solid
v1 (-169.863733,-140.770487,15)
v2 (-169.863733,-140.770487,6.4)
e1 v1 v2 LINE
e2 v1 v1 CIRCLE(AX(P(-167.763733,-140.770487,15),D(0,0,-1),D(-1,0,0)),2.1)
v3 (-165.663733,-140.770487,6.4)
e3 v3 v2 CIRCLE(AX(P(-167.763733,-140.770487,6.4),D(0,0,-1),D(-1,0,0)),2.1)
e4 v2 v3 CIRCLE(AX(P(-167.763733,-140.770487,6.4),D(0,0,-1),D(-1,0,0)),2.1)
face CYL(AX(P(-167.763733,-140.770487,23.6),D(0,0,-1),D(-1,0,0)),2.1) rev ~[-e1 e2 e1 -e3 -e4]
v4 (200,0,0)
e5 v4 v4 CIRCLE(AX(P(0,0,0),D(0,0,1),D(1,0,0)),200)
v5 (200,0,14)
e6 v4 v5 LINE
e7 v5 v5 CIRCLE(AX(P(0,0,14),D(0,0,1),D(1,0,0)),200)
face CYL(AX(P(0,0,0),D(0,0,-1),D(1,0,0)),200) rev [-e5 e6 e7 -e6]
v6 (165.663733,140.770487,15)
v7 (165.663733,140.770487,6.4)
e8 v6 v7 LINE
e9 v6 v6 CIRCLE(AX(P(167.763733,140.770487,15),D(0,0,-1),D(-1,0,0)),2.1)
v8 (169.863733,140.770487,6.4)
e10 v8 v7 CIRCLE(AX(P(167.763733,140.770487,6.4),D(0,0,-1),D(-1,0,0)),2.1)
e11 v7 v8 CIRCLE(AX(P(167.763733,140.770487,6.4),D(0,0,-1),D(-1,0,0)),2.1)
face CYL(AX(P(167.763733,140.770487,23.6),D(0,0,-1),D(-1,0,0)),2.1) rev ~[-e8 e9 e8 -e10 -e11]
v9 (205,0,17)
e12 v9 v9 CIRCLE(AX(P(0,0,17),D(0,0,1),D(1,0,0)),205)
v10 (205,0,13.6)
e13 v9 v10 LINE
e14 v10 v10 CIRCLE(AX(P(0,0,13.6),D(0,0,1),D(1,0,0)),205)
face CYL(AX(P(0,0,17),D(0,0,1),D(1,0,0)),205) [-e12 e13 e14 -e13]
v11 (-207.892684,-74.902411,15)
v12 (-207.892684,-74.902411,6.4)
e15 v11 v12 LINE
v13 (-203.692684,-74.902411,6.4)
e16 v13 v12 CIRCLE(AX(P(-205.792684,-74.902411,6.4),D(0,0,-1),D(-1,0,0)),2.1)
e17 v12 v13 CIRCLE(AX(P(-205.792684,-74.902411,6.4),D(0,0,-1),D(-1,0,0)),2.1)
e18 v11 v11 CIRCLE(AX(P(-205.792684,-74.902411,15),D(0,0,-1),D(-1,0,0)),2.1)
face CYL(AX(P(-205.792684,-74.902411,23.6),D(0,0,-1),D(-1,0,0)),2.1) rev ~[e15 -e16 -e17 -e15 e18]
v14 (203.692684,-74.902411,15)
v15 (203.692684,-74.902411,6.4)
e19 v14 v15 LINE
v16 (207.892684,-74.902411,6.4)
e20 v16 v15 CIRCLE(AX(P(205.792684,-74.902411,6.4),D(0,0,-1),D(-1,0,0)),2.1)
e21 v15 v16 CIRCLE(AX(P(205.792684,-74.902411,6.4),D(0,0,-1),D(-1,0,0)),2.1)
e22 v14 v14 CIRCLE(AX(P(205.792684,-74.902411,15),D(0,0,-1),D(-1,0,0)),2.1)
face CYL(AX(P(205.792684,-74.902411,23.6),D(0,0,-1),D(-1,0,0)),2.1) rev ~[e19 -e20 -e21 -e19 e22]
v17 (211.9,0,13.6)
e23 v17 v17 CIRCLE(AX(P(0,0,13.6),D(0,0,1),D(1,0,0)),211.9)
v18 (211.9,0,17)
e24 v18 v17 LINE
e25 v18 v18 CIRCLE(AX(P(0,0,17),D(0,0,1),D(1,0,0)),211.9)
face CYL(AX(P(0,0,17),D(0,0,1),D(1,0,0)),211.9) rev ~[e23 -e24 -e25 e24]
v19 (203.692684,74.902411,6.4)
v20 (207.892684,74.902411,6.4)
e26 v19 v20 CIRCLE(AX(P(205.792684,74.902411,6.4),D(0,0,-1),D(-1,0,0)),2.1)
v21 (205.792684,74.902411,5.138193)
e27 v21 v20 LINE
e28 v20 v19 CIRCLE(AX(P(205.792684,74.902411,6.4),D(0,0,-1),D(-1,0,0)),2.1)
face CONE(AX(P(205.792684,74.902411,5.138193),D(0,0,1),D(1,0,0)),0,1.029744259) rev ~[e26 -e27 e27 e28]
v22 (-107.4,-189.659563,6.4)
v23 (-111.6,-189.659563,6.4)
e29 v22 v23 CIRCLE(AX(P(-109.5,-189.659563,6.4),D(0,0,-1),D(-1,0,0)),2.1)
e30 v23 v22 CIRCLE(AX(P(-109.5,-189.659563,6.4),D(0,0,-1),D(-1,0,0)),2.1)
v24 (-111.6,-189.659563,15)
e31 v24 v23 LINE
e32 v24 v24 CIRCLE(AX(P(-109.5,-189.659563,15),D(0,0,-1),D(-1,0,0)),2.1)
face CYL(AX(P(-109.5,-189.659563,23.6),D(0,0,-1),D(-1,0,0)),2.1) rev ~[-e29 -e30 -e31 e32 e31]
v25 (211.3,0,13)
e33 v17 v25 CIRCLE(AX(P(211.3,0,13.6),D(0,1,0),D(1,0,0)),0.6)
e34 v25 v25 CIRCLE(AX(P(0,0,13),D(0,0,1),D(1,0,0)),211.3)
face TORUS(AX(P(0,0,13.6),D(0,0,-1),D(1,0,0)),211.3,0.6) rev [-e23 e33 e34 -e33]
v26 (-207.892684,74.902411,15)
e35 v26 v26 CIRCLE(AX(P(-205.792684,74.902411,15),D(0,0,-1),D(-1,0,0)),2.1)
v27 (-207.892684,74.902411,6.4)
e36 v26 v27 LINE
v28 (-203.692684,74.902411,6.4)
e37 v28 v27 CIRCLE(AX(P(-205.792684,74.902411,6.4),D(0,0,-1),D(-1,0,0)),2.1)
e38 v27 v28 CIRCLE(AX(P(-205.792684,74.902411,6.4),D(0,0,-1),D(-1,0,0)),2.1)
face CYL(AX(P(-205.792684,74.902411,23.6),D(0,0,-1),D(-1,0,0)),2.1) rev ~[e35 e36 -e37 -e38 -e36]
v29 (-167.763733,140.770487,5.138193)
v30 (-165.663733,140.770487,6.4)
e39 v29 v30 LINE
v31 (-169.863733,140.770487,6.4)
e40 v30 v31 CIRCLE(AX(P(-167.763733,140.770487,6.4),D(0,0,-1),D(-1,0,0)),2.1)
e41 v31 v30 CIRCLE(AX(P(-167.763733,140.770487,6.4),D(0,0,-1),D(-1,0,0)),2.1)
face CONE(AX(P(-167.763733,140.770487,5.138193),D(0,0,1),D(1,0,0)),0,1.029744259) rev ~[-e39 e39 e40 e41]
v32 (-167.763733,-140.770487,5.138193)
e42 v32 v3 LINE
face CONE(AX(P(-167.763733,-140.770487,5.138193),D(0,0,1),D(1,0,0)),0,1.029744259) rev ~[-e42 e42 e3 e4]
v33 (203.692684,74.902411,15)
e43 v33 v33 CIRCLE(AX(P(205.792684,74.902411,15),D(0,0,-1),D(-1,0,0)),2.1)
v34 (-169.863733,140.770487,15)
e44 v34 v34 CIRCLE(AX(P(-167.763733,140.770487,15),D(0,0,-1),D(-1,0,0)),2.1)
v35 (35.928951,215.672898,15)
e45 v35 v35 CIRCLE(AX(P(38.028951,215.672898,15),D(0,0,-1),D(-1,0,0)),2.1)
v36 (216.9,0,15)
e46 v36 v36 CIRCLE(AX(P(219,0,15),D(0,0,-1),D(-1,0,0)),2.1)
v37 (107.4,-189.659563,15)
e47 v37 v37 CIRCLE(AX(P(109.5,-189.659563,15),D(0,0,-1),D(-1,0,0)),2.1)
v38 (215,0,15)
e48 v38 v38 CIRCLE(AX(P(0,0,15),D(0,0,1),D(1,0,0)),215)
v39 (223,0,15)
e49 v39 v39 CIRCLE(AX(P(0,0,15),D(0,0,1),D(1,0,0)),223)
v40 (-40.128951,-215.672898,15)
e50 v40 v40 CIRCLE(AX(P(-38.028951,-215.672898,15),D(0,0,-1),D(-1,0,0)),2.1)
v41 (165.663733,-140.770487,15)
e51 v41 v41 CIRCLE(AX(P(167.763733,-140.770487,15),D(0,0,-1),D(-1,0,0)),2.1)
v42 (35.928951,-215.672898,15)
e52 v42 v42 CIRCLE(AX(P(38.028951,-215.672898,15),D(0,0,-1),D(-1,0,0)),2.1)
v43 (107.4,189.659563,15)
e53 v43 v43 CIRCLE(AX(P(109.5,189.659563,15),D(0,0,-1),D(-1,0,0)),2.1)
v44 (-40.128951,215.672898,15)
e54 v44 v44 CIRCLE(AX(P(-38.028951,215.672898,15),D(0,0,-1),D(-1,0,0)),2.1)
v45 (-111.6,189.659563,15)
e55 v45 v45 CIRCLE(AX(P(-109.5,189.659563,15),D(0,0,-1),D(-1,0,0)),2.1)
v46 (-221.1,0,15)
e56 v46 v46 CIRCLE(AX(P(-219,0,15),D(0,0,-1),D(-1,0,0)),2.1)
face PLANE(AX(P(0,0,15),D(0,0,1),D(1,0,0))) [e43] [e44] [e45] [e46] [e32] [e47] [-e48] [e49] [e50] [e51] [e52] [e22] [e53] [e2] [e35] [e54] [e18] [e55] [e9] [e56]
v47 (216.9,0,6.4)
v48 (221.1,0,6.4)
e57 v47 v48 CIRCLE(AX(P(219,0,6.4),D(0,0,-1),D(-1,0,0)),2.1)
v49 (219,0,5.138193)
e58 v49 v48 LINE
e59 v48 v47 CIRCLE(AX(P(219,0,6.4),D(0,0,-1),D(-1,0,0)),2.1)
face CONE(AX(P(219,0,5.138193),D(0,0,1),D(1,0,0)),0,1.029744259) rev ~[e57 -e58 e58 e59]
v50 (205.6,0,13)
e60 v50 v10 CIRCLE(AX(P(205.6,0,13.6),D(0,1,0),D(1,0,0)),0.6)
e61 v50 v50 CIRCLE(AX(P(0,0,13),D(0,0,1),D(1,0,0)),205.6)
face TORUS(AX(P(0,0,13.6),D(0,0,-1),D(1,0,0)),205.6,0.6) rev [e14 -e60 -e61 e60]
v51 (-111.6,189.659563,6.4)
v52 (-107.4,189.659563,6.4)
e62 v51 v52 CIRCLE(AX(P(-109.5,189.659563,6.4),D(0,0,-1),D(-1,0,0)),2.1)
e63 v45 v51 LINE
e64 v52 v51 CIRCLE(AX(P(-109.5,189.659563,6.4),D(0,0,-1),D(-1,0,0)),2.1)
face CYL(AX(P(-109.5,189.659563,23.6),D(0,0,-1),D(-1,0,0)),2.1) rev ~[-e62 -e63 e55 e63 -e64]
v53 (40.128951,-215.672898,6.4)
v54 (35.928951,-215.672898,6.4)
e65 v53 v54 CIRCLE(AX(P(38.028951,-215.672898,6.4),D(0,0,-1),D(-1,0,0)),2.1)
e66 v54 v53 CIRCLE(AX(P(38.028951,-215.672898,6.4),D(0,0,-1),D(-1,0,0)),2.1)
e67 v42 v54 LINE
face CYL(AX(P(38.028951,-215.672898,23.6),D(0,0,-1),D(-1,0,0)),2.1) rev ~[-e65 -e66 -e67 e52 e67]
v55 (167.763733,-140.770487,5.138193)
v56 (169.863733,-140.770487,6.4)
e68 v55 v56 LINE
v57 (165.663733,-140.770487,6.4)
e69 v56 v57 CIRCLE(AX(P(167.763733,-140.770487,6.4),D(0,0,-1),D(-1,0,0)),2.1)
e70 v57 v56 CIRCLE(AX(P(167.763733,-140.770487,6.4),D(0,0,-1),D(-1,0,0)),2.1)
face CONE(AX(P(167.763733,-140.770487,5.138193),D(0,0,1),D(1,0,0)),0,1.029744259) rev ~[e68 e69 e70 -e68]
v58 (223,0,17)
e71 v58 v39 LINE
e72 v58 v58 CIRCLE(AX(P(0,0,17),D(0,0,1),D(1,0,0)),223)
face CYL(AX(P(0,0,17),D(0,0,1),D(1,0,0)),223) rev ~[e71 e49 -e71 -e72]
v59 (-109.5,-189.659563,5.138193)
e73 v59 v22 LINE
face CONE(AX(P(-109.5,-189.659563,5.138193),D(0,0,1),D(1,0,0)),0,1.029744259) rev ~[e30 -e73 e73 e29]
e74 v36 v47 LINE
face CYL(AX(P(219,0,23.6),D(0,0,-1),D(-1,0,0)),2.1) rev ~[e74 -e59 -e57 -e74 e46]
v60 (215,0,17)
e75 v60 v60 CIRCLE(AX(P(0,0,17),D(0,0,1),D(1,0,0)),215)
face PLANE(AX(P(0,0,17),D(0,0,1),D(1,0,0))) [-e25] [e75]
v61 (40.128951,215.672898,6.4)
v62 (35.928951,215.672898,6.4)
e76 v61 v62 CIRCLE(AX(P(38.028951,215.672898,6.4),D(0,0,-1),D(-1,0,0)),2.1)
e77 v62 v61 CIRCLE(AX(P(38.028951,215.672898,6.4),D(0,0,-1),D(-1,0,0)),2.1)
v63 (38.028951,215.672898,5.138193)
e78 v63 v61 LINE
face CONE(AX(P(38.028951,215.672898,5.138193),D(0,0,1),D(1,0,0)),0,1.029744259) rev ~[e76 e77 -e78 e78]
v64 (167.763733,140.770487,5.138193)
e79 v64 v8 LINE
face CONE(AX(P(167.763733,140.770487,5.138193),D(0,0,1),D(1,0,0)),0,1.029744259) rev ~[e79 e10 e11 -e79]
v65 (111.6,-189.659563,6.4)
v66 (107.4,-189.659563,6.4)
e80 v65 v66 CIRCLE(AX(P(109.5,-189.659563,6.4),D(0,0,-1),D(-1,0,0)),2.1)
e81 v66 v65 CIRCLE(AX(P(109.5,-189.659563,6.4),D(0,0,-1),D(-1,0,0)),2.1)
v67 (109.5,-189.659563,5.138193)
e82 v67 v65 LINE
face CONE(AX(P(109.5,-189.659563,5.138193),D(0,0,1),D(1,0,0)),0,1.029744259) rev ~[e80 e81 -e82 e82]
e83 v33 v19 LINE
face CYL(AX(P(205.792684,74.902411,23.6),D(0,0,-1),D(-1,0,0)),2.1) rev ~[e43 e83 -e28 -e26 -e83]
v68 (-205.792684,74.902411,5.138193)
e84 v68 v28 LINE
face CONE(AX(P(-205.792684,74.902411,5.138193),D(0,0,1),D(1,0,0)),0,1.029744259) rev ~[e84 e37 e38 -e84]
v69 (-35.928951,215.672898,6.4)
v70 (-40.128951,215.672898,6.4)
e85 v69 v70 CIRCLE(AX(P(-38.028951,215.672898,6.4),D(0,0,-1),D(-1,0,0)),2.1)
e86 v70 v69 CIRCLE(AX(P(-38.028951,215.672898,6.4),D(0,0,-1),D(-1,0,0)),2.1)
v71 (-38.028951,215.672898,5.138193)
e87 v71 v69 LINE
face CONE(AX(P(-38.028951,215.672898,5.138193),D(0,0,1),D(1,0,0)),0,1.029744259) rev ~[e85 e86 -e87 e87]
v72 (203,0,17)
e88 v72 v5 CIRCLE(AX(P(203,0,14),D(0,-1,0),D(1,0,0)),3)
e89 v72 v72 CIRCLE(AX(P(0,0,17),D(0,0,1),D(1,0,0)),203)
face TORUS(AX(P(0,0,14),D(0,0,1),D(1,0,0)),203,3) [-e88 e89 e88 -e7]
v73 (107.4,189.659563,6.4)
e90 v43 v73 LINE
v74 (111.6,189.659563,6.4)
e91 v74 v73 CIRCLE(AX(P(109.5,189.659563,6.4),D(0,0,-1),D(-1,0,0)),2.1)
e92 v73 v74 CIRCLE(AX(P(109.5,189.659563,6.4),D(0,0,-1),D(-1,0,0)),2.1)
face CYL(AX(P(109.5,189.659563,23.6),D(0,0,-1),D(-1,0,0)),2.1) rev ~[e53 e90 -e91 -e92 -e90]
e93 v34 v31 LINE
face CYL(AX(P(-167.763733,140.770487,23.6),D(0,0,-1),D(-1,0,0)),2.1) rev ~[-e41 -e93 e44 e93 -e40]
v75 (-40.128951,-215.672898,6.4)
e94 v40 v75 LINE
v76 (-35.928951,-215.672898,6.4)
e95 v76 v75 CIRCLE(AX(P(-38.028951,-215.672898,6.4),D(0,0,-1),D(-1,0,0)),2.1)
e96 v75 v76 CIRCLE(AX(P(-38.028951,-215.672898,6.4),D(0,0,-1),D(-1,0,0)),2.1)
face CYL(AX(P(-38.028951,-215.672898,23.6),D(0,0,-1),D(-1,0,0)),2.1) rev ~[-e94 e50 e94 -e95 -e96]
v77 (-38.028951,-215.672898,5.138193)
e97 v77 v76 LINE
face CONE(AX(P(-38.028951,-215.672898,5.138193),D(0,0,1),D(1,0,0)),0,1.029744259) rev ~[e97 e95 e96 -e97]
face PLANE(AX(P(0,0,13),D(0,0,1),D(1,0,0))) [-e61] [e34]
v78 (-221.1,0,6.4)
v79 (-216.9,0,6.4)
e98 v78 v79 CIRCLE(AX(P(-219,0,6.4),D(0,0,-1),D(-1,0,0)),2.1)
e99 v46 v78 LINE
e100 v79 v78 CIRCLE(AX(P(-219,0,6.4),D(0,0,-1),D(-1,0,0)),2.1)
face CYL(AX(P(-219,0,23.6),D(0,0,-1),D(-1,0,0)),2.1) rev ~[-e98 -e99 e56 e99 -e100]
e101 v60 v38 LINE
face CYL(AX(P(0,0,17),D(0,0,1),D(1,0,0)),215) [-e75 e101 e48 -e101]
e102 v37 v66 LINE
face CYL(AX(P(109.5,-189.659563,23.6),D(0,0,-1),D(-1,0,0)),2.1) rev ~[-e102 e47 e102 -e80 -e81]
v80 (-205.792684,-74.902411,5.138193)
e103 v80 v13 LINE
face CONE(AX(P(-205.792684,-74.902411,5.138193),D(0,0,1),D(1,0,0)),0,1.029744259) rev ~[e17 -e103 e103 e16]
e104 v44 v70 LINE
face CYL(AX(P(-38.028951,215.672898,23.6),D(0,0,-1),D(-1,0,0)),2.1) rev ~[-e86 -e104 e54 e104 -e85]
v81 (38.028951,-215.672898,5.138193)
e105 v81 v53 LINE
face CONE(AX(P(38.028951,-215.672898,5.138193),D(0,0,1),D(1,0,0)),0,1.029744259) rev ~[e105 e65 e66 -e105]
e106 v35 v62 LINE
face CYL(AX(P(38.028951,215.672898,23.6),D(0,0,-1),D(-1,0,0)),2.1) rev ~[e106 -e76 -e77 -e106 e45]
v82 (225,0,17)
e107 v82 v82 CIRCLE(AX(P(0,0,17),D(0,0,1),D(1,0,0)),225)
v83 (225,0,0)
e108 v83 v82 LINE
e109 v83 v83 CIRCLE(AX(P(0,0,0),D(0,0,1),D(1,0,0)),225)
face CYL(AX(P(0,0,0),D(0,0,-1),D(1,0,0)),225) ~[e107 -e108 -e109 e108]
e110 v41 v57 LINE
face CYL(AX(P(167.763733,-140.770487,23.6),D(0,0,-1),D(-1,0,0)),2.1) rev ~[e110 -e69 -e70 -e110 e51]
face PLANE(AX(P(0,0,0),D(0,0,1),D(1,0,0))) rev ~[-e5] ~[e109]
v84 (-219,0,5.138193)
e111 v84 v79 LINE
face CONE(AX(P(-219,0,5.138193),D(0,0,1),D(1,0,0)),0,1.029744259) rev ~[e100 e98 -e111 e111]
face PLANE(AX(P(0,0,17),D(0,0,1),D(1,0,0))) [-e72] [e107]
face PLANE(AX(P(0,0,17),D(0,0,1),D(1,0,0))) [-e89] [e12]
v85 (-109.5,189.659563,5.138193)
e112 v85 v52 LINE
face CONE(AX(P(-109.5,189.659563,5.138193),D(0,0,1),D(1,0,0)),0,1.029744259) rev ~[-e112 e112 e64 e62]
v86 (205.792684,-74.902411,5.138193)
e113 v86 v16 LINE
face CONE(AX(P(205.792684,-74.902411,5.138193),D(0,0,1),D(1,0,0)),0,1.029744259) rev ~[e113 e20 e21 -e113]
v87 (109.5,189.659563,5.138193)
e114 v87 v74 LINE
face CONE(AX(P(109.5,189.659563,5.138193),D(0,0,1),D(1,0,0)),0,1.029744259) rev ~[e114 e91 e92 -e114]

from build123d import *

# Parameters (mm, degrees)
F0_R     = 225
F0_R_2   = 200
F1_DEPTH = 17
F2_R     = 211.9
F2_R_2   = 205
F3_DEPTH = 4
F4_R     = 0.6
F5_R     = 223
F5_R_2   = 215
F6_DEPTH = 2
F7_R     = 3
F9_D     = 4.2
F9_DEPTH = 8.6
F9_TIP   = 1.2618073


# Not quite as in the source:
# - a feature names something its author has since deleted; it is built from what else it names


with BuildPart() as f1:
    # F0 (on Top) → F1 (new body)
    with BuildSketch(Plane.XY):
        Circle(F0_R)
        Circle(F0_R_2, mode=Mode.SUBTRACT)
    extrude(amount=F1_DEPTH)

    # F2 (on face) → F3 (cut)
    with BuildSketch(Plane.XY.offset(17)):
        Circle(F2_R)
        Circle(F2_R_2, mode=Mode.SUBTRACT)
    extrude(amount=-F3_DEPTH, mode=Mode.SUBTRACT)

    # F4
    f4_edges = [f1.edges().sort_by_distance(p)[0] for p in [
        (-211.9, 0, 13),
        (-205, 0, 13),
    ]]
    fillet(f4_edges, radius=F4_R)

    # F5 (on face) → F6 (cut)
    with BuildSketch(Plane.XY.offset(17)):
        Circle(F5_R)
        Circle(F5_R_2, mode=Mode.SUBTRACT)
    extrude(amount=-F6_DEPTH, mode=Mode.SUBTRACT)

    # F7
    f7_edges = [f1.edges().sort_by_distance(p)[0] for p in [
        (-200, 0, 17),
    ]]
    fillet(f7_edges, radius=F7_R)

    # F9
    with Locations(Plane.XY.offset(15)):
        with Locations((219, 0), (205.7926839521, 74.9024113883), (167.7637330431, 140.7704865214), (109.5, 189.6595634288), (38.0289509091, 215.6728979097), (-38.0289509091, 215.6728979097), (-109.5, 189.6595634288), (-167.7637330431, 140.7704865214), (-205.7926839521, 74.9024113883), (-219, 0), (-205.7926839521, -74.9024113883), (-167.7637330431, -140.7704865214), (-109.5, -189.6595634288), (-38.0289509091, -215.6728979097), (38.0289509091, -215.6728979097), (109.5, -189.6595634288), (167.7637330431, -140.7704865214), (205.7926839521, -74.9024113883)):
            Hole(F9_D / 2, depth=F9_DEPTH)
            with Locations((0, 0, -(F9_DEPTH + F9_TIP / 2))):  # 118° drill point
                Cone(0, F9_D / 2, F9_TIP, mode=Mode.SUBTRACT)


solid = f1.part
